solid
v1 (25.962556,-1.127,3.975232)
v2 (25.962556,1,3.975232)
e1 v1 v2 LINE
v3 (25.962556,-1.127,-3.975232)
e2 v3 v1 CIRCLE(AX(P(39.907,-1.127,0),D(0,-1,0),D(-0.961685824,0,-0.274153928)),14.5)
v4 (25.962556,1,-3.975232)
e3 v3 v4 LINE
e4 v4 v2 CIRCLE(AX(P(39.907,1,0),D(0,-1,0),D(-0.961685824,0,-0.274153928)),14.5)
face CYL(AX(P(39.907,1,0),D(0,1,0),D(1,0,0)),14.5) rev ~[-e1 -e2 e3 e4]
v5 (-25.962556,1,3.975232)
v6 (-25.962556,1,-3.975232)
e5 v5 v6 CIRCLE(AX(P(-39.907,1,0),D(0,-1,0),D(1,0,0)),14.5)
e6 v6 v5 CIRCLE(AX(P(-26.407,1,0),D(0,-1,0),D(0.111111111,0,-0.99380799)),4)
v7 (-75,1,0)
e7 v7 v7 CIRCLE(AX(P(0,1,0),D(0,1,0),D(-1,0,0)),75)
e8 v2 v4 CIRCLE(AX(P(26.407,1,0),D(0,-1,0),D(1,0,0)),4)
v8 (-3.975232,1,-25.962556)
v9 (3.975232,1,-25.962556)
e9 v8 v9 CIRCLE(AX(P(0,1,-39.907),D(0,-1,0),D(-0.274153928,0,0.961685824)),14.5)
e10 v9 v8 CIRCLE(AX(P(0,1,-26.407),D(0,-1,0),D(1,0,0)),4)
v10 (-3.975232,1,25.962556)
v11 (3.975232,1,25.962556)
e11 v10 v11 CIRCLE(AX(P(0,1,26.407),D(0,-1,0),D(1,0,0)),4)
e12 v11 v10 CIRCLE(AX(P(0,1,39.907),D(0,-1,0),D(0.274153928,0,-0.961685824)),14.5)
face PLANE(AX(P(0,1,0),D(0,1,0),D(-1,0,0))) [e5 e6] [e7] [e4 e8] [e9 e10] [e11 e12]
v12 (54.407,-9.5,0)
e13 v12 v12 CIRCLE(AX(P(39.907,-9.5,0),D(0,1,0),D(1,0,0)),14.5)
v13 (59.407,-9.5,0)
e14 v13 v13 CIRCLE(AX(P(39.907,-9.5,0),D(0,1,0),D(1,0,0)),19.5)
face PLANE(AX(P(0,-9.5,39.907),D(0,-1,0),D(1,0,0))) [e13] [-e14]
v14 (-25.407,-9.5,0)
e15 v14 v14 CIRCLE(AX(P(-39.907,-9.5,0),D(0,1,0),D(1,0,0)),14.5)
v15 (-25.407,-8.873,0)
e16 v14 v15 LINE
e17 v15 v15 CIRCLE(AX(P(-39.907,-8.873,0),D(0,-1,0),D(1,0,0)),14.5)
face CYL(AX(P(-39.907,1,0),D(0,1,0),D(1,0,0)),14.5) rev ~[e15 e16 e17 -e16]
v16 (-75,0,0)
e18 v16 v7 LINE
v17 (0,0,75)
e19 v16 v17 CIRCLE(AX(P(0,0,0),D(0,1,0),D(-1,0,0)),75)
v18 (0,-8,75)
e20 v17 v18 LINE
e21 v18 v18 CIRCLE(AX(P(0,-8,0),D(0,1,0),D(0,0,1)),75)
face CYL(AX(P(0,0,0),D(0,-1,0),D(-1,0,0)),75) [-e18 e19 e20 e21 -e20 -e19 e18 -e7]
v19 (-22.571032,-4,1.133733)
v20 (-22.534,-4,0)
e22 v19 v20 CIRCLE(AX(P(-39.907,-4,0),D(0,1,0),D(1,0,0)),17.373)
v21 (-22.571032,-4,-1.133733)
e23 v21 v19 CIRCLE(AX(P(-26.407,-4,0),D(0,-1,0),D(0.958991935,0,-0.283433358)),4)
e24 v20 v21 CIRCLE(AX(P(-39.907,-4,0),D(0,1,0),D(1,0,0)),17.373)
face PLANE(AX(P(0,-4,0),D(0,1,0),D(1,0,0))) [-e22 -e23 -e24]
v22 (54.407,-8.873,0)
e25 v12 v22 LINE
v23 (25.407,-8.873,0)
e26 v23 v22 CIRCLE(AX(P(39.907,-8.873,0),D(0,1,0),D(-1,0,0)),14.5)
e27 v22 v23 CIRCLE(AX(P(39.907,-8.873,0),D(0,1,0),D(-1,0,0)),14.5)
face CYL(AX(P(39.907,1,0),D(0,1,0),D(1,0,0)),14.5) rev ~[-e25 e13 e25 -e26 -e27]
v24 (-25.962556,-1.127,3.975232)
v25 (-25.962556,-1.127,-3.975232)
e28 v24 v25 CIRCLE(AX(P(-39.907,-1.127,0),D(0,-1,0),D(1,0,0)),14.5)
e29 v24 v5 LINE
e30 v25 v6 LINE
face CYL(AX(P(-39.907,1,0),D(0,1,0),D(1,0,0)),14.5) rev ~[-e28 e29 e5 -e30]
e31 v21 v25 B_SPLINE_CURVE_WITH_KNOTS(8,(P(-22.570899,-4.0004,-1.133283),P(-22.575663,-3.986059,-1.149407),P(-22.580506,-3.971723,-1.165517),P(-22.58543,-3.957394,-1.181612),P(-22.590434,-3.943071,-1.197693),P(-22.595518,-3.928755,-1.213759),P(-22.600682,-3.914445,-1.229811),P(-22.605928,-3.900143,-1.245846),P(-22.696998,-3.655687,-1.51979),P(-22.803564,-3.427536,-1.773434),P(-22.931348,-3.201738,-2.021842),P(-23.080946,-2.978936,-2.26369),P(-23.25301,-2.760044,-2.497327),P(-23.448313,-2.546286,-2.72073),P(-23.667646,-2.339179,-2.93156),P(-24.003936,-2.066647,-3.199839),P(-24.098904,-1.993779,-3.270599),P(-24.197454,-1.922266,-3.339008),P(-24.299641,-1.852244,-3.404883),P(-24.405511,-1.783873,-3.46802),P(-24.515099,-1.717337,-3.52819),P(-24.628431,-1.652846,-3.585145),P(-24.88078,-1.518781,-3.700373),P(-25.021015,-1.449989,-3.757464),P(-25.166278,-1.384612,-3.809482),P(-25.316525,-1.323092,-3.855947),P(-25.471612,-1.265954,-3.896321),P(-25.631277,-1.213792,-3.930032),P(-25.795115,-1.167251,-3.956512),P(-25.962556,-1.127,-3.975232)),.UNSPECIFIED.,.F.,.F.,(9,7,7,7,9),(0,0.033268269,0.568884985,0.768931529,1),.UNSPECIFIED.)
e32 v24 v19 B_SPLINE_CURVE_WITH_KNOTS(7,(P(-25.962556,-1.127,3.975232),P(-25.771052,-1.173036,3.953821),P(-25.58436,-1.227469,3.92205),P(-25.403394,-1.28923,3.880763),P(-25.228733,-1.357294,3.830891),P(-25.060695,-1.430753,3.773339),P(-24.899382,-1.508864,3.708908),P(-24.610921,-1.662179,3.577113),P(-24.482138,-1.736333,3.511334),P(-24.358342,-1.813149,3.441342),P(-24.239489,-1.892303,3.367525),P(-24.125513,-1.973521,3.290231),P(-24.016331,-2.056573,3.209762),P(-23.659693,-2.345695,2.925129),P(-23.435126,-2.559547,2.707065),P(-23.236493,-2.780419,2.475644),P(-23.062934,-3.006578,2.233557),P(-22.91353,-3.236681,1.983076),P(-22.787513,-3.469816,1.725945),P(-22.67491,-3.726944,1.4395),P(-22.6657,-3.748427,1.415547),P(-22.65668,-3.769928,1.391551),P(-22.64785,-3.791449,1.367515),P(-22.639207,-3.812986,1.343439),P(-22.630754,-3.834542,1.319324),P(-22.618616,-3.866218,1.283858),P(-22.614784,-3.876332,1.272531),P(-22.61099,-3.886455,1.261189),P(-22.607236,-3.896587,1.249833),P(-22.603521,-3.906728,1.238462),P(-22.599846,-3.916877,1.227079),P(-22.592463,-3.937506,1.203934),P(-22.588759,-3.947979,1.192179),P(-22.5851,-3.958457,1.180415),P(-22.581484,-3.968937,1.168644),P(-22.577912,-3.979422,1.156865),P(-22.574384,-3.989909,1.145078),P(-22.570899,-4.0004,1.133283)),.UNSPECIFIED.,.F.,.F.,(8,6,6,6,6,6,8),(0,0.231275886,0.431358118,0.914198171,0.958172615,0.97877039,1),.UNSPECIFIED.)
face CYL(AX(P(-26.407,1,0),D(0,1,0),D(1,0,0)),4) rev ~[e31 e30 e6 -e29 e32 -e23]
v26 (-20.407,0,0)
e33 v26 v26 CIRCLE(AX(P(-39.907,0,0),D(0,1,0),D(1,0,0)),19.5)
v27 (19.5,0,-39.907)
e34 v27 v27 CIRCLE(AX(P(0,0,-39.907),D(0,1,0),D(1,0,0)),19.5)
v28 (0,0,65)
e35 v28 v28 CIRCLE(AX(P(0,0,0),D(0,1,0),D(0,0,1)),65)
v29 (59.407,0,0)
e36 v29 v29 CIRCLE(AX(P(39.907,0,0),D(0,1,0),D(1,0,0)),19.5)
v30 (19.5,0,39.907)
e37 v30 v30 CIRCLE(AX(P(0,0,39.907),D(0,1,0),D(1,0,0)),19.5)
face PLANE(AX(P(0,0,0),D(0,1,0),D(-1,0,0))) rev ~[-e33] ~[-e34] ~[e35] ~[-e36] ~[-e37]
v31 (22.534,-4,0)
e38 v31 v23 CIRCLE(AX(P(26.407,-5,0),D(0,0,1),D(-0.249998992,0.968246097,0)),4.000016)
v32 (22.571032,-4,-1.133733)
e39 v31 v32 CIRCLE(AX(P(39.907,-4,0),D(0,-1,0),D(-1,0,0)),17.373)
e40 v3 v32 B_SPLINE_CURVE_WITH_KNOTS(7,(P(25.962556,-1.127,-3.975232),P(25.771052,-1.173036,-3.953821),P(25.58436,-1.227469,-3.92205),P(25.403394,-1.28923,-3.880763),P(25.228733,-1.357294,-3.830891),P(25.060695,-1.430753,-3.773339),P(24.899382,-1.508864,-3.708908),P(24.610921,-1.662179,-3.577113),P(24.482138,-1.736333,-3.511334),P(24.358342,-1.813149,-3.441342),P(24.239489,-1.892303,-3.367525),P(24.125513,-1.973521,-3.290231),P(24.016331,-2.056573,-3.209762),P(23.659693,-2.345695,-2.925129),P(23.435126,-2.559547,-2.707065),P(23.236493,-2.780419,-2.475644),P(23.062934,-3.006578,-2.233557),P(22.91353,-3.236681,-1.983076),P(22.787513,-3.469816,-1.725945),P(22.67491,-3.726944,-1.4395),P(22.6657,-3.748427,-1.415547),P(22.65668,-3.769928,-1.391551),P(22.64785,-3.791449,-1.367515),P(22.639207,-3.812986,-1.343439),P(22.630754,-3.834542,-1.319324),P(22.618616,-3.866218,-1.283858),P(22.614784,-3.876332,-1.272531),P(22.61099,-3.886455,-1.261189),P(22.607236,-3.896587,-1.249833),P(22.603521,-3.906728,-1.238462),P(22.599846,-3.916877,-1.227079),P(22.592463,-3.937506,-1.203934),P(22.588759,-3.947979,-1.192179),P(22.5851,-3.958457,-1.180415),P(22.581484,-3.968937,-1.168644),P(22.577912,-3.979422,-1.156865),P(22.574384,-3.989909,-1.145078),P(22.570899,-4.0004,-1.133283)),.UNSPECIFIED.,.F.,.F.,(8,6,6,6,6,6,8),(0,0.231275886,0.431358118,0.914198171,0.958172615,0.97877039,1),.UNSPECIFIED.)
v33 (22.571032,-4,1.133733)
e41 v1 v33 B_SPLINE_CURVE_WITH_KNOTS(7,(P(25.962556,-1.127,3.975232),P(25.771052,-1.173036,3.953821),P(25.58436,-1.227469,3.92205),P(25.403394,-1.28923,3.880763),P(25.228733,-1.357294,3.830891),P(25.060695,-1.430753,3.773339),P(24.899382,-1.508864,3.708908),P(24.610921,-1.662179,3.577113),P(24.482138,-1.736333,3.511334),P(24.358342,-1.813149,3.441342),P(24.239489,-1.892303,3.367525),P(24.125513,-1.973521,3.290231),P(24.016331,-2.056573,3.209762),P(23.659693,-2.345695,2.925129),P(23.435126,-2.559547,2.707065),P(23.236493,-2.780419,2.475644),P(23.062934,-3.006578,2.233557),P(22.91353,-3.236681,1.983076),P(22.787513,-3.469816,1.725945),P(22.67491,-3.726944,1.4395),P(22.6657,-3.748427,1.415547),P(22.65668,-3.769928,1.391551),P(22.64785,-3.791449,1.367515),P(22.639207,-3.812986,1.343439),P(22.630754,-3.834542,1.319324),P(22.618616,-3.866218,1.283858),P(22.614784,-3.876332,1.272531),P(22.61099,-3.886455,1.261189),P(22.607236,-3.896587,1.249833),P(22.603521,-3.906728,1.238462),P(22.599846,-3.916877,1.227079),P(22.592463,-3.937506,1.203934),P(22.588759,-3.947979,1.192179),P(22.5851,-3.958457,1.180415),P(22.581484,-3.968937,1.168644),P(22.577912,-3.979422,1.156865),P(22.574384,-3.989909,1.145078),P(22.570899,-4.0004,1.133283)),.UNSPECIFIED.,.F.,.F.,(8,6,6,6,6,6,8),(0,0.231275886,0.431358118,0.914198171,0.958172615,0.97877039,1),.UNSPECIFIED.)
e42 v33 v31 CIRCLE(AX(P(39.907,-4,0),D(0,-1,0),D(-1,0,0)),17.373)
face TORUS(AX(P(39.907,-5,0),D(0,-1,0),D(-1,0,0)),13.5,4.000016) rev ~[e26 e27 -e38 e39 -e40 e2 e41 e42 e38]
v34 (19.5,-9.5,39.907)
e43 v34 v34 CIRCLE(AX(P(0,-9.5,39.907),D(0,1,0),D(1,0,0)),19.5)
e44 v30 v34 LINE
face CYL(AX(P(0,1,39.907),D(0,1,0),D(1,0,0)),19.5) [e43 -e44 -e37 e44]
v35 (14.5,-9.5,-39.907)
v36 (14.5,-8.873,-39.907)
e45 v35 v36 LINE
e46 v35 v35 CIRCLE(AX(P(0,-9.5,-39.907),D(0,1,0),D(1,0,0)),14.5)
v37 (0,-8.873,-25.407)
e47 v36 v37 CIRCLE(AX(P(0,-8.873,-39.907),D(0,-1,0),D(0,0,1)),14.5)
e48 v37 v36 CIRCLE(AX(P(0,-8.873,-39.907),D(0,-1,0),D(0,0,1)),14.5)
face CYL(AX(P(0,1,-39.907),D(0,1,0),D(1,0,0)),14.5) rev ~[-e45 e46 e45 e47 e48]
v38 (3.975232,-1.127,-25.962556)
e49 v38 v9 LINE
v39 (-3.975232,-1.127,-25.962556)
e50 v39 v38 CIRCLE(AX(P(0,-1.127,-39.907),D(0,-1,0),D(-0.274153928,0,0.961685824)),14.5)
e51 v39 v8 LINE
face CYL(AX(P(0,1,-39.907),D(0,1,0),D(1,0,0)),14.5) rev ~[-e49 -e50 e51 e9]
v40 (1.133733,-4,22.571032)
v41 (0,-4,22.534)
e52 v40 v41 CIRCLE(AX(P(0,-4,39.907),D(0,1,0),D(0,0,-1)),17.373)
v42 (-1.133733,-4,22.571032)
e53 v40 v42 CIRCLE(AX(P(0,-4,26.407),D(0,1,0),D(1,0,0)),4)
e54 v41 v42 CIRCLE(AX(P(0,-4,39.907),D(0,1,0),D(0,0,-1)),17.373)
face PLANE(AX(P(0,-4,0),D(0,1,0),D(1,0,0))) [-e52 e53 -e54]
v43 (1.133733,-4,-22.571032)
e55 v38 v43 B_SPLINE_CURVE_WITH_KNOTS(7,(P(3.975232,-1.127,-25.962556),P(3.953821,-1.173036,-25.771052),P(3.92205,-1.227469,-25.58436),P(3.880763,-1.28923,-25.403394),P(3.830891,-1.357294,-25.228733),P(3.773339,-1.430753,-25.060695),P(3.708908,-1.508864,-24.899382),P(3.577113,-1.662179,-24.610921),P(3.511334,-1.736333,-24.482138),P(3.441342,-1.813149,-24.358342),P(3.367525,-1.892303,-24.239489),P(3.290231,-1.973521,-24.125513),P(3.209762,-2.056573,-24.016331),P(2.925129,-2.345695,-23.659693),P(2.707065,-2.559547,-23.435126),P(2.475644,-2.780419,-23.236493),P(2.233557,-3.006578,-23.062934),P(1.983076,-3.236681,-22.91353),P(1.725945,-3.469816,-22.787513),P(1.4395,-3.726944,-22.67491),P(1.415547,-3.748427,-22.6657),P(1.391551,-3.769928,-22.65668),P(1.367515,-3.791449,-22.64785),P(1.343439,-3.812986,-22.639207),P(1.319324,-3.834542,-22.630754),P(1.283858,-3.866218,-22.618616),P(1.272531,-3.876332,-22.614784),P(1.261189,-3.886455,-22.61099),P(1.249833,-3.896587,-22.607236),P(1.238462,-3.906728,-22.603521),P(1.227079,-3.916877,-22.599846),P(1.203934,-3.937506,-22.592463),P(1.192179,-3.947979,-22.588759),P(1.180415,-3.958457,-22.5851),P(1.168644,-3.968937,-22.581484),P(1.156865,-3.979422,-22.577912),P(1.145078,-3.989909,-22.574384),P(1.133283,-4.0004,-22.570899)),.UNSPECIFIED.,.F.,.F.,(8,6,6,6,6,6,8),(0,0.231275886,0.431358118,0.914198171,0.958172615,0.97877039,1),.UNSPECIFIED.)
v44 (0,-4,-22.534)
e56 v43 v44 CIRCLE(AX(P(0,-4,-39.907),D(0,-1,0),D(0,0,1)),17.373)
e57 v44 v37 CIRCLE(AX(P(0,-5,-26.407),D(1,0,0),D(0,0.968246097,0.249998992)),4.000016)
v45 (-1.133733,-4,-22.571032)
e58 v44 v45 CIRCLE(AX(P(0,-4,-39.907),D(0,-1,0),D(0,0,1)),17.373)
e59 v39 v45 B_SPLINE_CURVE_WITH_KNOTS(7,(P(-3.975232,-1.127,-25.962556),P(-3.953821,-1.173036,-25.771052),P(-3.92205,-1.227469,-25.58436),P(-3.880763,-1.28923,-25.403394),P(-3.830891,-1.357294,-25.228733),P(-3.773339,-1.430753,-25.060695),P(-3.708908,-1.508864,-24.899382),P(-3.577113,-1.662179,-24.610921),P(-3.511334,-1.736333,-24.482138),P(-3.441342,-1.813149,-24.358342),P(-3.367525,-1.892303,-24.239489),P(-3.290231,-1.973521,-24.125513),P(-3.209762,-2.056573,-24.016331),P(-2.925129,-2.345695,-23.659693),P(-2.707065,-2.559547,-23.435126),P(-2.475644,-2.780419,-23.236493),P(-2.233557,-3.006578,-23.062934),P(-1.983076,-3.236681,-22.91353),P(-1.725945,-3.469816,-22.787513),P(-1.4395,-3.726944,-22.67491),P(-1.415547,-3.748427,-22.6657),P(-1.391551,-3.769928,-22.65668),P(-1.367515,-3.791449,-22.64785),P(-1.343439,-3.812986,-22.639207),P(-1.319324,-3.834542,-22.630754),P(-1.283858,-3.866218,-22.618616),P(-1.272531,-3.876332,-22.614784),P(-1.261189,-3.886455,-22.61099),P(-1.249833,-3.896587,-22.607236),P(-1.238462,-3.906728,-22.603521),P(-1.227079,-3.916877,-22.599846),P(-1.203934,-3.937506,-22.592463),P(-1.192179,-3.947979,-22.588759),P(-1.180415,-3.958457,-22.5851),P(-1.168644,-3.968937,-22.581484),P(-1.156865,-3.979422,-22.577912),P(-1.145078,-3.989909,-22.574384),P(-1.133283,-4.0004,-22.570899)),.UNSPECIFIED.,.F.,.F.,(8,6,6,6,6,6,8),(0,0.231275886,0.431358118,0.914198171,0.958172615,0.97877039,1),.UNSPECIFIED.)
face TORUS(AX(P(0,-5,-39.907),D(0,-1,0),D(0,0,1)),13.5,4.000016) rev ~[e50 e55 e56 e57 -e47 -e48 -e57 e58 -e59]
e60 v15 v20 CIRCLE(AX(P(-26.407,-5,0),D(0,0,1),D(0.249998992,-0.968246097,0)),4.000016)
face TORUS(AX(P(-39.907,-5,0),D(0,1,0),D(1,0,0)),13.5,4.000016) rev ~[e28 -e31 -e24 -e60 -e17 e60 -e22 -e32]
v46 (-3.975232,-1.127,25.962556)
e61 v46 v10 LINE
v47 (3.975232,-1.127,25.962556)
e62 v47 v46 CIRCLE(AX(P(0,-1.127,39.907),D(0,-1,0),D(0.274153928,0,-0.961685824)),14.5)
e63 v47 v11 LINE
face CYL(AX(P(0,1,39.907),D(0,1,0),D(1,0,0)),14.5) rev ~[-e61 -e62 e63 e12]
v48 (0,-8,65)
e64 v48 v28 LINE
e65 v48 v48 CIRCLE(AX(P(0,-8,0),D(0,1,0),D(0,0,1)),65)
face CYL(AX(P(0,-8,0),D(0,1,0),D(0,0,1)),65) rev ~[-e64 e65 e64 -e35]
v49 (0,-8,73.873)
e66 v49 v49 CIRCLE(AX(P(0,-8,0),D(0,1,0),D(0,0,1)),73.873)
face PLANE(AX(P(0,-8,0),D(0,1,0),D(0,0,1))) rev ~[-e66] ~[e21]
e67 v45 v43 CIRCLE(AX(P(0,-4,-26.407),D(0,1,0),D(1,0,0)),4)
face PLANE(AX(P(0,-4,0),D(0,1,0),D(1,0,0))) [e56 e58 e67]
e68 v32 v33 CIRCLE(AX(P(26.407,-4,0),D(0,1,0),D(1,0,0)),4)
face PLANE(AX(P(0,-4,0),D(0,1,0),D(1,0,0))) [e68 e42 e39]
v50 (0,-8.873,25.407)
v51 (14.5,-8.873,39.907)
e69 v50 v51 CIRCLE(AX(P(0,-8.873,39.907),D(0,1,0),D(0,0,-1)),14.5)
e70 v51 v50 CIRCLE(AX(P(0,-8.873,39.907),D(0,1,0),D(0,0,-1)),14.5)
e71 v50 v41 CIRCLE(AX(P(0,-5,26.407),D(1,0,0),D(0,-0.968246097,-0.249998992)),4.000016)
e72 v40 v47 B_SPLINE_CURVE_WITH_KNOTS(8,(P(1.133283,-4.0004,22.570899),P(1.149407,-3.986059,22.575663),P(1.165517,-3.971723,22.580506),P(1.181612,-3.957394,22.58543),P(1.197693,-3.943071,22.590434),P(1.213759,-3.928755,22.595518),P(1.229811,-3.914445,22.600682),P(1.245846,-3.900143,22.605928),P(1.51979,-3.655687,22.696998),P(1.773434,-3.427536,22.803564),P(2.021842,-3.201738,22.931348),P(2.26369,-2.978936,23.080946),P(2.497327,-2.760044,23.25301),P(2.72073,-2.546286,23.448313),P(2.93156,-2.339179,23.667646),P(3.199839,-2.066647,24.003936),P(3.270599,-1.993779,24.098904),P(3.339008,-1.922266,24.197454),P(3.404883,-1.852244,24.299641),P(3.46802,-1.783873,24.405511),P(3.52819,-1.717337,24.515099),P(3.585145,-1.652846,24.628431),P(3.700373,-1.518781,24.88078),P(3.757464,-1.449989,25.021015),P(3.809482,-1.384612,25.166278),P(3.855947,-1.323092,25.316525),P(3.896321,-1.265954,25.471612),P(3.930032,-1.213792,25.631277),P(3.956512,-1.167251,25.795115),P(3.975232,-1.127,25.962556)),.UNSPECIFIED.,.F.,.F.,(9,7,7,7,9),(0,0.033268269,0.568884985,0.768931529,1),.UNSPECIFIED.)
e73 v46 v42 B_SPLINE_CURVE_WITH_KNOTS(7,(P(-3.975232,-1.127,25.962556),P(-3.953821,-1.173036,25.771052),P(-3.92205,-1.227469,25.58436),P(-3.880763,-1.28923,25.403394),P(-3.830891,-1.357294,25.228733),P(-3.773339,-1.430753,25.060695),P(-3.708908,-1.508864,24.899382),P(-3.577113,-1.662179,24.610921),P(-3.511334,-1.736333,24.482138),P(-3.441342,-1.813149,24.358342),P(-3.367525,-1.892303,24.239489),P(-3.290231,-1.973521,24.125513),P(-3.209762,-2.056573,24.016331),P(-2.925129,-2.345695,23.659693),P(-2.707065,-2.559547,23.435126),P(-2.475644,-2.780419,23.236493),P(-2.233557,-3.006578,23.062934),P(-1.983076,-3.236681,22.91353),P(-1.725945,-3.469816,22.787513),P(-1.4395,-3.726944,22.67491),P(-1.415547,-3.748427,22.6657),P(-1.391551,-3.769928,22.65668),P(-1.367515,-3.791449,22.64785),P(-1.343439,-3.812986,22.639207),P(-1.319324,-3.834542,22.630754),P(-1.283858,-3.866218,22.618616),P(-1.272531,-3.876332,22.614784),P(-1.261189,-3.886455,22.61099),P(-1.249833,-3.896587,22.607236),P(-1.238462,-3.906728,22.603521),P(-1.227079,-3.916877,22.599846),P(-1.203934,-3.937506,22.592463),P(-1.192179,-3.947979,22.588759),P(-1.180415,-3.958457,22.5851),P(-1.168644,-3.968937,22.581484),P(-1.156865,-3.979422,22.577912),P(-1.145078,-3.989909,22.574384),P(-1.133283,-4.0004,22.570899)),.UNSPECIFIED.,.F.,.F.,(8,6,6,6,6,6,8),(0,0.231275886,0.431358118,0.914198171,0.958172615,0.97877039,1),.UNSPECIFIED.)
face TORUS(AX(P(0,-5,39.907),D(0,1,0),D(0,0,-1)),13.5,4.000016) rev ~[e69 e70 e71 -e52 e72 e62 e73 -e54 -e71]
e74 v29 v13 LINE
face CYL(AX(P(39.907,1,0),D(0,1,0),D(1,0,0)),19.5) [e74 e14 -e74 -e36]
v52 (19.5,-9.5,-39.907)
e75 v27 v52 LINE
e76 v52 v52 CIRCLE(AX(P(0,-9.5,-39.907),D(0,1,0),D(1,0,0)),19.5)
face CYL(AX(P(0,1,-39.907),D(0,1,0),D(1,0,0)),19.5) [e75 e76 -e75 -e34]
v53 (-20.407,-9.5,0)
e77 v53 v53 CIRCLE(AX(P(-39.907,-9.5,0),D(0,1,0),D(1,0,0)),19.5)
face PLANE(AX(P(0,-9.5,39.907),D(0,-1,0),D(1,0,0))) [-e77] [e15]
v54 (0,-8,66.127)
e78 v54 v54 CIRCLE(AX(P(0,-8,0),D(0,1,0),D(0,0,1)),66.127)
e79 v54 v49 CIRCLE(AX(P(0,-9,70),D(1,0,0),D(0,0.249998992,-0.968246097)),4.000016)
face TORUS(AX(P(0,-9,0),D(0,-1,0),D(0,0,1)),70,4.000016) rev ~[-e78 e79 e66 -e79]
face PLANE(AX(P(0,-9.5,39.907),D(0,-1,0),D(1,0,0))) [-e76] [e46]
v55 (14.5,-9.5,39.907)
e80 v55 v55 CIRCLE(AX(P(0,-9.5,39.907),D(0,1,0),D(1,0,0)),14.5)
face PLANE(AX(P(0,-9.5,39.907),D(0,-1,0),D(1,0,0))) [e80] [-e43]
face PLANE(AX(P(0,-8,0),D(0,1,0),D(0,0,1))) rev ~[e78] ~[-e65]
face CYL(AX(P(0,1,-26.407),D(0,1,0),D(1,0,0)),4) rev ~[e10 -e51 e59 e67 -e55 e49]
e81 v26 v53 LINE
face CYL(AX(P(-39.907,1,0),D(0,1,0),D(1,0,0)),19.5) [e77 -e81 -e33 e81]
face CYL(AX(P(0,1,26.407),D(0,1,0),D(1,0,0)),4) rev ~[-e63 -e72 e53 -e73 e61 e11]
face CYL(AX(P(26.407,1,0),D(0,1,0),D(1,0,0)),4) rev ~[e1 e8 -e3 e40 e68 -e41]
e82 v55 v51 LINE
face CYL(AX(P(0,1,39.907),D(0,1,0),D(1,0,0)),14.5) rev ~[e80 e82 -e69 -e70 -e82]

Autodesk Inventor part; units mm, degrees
ref_plane "YZ Plane" through (0, 0, 0) normal (1, 0, 0) x (0, 1, 0)
ref_plane "XZ Plane" through (0, 0, 0) normal (0, 1, 0) x (-1, 0, 0)
ref_plane "XY Plane" through (0, 0, 0) normal (0, 0, 1) x (1, 0, 0)
sketch "Эскиз1" plane through (0, 0, 0) normal (0, 1, 0) x (-1, 0, 0)
  circle A0 centre (0, 0) radius 75
  dimension "d0" = 150
extrude "Выдавливание1" add sketch "Эскиз1" along normal blind 1
sketch "Эскиз2" plane through (0, 0, 0) normal (1, 0, 0) x (0, 1, 0)
  line L0 (0, 0) -> (0, 75)
  line L1 (0, 75) -> (-8, 75)
  line L2 (-8, 65) -> (0, 65)
  line L3 (-8, 75) -> (-8, 73.873)
  arc A0 (-8, 66.127) -> (-8, 73.873) centre (-9, 70) ccw
  line L4 (-8, 75) -> (-8, 73.873)
  line L5 (-8, 66.127) -> (-8, 65)
  line L6 (-11, 0) -> (3, 0) projected
  dimension "d3" = 75
  dimension "d4" = 8
  dimension "d5" = 10
  dimension "d8" = 8
revolve "Вращение1" add sketch "Эскиз2" angle 360 about axis through (0, -10, 0) along (0, 1, 0)
sketch "Эскиз3" plane through (0, 1, 0) normal (0, 1, 0) x (1, 0, 0)
  circle A0 centre (0, 0) radius 39.907
  circle A1 centre (0, 39.907) radius 14.5
  circle A2 centre (39.907, 0) radius 14.5
  circle A3 centre (-39.907, 0) radius 14.5
  circle A4 centre (0, -39.907) radius 14.5
  dimension "d16" = 79.814
  dimension "d17" = 29
  dimension "d18" = 29
  dimension "d19" = 29
  dimension "d20" = 29
extrude "Выдавливание2" cut sketch "Эскиз3" against normal blind 1 contours A0 A2 | A0 A2 | A1 A0 | A0 A1 | A4 A0 | A0 A4 | A3 A0 | A0 A3
sketch "Эскиз6" plane through (0, 1, 0) normal (0, 1, 0) x (1, 0, 0)
  circle A0 centre (0, 39.907) radius 14.5
  circle A1 centre (0, 39.907) radius 19.5
  circle A2 centre (39.907, 0) radius 14.5
  circle A3 centre (39.907, 0) radius 19.5
  circle A4 centre (0, -39.907) radius 19.5
  circle A5 centre (0, -39.907) radius 14.5
  circle A6 centre (-39.907, 0) radius 14.5
  circle A7 centre (-39.907, 0) radius 19.5
  point P0 (0, 0)
  dimension "d36" = 39
  dimension "d37" = 39
  dimension "d38" = 39
  dimension "d39" = 39
extrude "Выдавливание3" add sketch "Эскиз6" against normal blind 11
sketch "Эскиз7" plane through (0, 0, 0) normal (1, 0, 0) x (0, 1, 0)
  line L0 (-1.127, -25.407) -> (-8.873, -25.407)
  line L1 (0, -20.407) -> (-10, -20.407) projected
  line L2 (-8.873, -25.407) -> (-5, -25.407)
  line L3 (1, -25.407) -> (-10, -25.407) projected
  arc A0 (-1.127, -25.407) -> (-8.873, -25.407) centre (-5, -26.407) ccw
  line L4 (3.2, -39.907) -> (-12.2, -39.907) projected
  point P0 (0, 0)
revolve "Вращение2" cut sketch "Эскиз7" angle 360 about axis through (0, 1, -39.907) along (0, -1, 0)
sketch "Эскиз8" plane through (0, 0, 0) normal (1, 0, 0) x (0, 1, 0)
  line L0 (0, -75) -> (0, 75) projected
  line L1 (-1.127, 25.407) -> (-8.873, 25.407)
  line L2 (1, 25.407) -> (-10, 25.407) projected
  arc A0 (-8.873, 25.407) -> (-1.127, 25.407) centre (-5, 26.407) ccw
  line L3 (-12.2, 39.907) -> (3.2, 39.907) projected
  point P0 (0, 0)
  dimension "d52" = 8
revolve "Вращение3" cut sketch "Эскиз8" angle 360 about axis through (0, 0, 39.907) along (0, 1, 0)
sketch "Эскиз9" plane through (0, 0, 0) normal (0, 0, 1) x (1, 0, 0)
  line L0 (75, 0) -> (-75, 0) projected
  line L1 (25.407, -1.127) -> (25.407, -8.873)
  line L2 (25.407, -5) -> (26.407, -5)
  arc A0 (25.407, -1.127) -> (25.407, -8.873) centre (26.407, -5) ccw
  line L3 (39.907, -10.8476) -> (39.907, 2.9746) projected
  point P0 (0, 0)
  dimension "d57" = 1
  dimension "d58" = 8
revolve "Вращение4" cut sketch "Эскиз9" angle 360 about axis through (39.907, 0, 0) along (0, 1, 0)
sketch "Эскиз10" plane through (0, 0, 0) normal (0, 0, 1) x (1, 0, 0)
  line L0 (75, 0) -> (-75, 0) projected
  line L1 (-25.407, -1.127) -> (-25.407, -8.873)
  line L2 (-25.407, -5) -> (-26.407, -5)
  arc A0 (-25.407, -8.873) -> (-25.407, -1.127) centre (-26.407, -5) ccw
  line L3 (-39.907, 3.2) -> (-39.907, -12.2) projected
  point P0 (0, 0)
  dimension "d63" = 1
  dimension "d64" = 8
revolve "Вращение5" cut sketch "Эскиз10" angle 360 about axis through (-39.907, 1, 0) along (0, -1, 0)
sketch "Эскиз11" plane through (0, -10, 39.907) normal (0, -1, 0) x (1, 0, 0)
  circle A0 centre (0, 0) radius 115.9174
  point P0 (0, -39.907)
extrude "Выдавливание4" cut sketch "Эскиз11" against normal blind 0.5
sketch "Эскиз12" plane through (0, 1, 0) normal (0, 1, 0) x (1, 0, 0)
  line L0 (0, 0) -> (0, -26.407)
  line L1 (0, 0) -> (-26.407, 0)
  line L2 (0, 0) -> (0, 26.407)
  line L3 (0, 0) -> (26.407, 0)
  circle A0 centre (0, -26.407) radius 4
  circle A1 centre (-26.407, 0) radius 4
  circle A2 centre (0, 26.407) radius 4
  circle A3 centre (26.407, 0) radius 4
  dimension "d68" = 26.407
  dimension "d69" = 26.407
  dimension "d70" = 26.407
  dimension "d71" = 26.407
  dimension "d72" = 8
  dimension "d73" = 8
  dimension "d74" = 8
  dimension "d75" = 8
extrude "Выдавливание5" cut sketch "Эскиз12" against normal blind 5
properties part number "Крышка"
